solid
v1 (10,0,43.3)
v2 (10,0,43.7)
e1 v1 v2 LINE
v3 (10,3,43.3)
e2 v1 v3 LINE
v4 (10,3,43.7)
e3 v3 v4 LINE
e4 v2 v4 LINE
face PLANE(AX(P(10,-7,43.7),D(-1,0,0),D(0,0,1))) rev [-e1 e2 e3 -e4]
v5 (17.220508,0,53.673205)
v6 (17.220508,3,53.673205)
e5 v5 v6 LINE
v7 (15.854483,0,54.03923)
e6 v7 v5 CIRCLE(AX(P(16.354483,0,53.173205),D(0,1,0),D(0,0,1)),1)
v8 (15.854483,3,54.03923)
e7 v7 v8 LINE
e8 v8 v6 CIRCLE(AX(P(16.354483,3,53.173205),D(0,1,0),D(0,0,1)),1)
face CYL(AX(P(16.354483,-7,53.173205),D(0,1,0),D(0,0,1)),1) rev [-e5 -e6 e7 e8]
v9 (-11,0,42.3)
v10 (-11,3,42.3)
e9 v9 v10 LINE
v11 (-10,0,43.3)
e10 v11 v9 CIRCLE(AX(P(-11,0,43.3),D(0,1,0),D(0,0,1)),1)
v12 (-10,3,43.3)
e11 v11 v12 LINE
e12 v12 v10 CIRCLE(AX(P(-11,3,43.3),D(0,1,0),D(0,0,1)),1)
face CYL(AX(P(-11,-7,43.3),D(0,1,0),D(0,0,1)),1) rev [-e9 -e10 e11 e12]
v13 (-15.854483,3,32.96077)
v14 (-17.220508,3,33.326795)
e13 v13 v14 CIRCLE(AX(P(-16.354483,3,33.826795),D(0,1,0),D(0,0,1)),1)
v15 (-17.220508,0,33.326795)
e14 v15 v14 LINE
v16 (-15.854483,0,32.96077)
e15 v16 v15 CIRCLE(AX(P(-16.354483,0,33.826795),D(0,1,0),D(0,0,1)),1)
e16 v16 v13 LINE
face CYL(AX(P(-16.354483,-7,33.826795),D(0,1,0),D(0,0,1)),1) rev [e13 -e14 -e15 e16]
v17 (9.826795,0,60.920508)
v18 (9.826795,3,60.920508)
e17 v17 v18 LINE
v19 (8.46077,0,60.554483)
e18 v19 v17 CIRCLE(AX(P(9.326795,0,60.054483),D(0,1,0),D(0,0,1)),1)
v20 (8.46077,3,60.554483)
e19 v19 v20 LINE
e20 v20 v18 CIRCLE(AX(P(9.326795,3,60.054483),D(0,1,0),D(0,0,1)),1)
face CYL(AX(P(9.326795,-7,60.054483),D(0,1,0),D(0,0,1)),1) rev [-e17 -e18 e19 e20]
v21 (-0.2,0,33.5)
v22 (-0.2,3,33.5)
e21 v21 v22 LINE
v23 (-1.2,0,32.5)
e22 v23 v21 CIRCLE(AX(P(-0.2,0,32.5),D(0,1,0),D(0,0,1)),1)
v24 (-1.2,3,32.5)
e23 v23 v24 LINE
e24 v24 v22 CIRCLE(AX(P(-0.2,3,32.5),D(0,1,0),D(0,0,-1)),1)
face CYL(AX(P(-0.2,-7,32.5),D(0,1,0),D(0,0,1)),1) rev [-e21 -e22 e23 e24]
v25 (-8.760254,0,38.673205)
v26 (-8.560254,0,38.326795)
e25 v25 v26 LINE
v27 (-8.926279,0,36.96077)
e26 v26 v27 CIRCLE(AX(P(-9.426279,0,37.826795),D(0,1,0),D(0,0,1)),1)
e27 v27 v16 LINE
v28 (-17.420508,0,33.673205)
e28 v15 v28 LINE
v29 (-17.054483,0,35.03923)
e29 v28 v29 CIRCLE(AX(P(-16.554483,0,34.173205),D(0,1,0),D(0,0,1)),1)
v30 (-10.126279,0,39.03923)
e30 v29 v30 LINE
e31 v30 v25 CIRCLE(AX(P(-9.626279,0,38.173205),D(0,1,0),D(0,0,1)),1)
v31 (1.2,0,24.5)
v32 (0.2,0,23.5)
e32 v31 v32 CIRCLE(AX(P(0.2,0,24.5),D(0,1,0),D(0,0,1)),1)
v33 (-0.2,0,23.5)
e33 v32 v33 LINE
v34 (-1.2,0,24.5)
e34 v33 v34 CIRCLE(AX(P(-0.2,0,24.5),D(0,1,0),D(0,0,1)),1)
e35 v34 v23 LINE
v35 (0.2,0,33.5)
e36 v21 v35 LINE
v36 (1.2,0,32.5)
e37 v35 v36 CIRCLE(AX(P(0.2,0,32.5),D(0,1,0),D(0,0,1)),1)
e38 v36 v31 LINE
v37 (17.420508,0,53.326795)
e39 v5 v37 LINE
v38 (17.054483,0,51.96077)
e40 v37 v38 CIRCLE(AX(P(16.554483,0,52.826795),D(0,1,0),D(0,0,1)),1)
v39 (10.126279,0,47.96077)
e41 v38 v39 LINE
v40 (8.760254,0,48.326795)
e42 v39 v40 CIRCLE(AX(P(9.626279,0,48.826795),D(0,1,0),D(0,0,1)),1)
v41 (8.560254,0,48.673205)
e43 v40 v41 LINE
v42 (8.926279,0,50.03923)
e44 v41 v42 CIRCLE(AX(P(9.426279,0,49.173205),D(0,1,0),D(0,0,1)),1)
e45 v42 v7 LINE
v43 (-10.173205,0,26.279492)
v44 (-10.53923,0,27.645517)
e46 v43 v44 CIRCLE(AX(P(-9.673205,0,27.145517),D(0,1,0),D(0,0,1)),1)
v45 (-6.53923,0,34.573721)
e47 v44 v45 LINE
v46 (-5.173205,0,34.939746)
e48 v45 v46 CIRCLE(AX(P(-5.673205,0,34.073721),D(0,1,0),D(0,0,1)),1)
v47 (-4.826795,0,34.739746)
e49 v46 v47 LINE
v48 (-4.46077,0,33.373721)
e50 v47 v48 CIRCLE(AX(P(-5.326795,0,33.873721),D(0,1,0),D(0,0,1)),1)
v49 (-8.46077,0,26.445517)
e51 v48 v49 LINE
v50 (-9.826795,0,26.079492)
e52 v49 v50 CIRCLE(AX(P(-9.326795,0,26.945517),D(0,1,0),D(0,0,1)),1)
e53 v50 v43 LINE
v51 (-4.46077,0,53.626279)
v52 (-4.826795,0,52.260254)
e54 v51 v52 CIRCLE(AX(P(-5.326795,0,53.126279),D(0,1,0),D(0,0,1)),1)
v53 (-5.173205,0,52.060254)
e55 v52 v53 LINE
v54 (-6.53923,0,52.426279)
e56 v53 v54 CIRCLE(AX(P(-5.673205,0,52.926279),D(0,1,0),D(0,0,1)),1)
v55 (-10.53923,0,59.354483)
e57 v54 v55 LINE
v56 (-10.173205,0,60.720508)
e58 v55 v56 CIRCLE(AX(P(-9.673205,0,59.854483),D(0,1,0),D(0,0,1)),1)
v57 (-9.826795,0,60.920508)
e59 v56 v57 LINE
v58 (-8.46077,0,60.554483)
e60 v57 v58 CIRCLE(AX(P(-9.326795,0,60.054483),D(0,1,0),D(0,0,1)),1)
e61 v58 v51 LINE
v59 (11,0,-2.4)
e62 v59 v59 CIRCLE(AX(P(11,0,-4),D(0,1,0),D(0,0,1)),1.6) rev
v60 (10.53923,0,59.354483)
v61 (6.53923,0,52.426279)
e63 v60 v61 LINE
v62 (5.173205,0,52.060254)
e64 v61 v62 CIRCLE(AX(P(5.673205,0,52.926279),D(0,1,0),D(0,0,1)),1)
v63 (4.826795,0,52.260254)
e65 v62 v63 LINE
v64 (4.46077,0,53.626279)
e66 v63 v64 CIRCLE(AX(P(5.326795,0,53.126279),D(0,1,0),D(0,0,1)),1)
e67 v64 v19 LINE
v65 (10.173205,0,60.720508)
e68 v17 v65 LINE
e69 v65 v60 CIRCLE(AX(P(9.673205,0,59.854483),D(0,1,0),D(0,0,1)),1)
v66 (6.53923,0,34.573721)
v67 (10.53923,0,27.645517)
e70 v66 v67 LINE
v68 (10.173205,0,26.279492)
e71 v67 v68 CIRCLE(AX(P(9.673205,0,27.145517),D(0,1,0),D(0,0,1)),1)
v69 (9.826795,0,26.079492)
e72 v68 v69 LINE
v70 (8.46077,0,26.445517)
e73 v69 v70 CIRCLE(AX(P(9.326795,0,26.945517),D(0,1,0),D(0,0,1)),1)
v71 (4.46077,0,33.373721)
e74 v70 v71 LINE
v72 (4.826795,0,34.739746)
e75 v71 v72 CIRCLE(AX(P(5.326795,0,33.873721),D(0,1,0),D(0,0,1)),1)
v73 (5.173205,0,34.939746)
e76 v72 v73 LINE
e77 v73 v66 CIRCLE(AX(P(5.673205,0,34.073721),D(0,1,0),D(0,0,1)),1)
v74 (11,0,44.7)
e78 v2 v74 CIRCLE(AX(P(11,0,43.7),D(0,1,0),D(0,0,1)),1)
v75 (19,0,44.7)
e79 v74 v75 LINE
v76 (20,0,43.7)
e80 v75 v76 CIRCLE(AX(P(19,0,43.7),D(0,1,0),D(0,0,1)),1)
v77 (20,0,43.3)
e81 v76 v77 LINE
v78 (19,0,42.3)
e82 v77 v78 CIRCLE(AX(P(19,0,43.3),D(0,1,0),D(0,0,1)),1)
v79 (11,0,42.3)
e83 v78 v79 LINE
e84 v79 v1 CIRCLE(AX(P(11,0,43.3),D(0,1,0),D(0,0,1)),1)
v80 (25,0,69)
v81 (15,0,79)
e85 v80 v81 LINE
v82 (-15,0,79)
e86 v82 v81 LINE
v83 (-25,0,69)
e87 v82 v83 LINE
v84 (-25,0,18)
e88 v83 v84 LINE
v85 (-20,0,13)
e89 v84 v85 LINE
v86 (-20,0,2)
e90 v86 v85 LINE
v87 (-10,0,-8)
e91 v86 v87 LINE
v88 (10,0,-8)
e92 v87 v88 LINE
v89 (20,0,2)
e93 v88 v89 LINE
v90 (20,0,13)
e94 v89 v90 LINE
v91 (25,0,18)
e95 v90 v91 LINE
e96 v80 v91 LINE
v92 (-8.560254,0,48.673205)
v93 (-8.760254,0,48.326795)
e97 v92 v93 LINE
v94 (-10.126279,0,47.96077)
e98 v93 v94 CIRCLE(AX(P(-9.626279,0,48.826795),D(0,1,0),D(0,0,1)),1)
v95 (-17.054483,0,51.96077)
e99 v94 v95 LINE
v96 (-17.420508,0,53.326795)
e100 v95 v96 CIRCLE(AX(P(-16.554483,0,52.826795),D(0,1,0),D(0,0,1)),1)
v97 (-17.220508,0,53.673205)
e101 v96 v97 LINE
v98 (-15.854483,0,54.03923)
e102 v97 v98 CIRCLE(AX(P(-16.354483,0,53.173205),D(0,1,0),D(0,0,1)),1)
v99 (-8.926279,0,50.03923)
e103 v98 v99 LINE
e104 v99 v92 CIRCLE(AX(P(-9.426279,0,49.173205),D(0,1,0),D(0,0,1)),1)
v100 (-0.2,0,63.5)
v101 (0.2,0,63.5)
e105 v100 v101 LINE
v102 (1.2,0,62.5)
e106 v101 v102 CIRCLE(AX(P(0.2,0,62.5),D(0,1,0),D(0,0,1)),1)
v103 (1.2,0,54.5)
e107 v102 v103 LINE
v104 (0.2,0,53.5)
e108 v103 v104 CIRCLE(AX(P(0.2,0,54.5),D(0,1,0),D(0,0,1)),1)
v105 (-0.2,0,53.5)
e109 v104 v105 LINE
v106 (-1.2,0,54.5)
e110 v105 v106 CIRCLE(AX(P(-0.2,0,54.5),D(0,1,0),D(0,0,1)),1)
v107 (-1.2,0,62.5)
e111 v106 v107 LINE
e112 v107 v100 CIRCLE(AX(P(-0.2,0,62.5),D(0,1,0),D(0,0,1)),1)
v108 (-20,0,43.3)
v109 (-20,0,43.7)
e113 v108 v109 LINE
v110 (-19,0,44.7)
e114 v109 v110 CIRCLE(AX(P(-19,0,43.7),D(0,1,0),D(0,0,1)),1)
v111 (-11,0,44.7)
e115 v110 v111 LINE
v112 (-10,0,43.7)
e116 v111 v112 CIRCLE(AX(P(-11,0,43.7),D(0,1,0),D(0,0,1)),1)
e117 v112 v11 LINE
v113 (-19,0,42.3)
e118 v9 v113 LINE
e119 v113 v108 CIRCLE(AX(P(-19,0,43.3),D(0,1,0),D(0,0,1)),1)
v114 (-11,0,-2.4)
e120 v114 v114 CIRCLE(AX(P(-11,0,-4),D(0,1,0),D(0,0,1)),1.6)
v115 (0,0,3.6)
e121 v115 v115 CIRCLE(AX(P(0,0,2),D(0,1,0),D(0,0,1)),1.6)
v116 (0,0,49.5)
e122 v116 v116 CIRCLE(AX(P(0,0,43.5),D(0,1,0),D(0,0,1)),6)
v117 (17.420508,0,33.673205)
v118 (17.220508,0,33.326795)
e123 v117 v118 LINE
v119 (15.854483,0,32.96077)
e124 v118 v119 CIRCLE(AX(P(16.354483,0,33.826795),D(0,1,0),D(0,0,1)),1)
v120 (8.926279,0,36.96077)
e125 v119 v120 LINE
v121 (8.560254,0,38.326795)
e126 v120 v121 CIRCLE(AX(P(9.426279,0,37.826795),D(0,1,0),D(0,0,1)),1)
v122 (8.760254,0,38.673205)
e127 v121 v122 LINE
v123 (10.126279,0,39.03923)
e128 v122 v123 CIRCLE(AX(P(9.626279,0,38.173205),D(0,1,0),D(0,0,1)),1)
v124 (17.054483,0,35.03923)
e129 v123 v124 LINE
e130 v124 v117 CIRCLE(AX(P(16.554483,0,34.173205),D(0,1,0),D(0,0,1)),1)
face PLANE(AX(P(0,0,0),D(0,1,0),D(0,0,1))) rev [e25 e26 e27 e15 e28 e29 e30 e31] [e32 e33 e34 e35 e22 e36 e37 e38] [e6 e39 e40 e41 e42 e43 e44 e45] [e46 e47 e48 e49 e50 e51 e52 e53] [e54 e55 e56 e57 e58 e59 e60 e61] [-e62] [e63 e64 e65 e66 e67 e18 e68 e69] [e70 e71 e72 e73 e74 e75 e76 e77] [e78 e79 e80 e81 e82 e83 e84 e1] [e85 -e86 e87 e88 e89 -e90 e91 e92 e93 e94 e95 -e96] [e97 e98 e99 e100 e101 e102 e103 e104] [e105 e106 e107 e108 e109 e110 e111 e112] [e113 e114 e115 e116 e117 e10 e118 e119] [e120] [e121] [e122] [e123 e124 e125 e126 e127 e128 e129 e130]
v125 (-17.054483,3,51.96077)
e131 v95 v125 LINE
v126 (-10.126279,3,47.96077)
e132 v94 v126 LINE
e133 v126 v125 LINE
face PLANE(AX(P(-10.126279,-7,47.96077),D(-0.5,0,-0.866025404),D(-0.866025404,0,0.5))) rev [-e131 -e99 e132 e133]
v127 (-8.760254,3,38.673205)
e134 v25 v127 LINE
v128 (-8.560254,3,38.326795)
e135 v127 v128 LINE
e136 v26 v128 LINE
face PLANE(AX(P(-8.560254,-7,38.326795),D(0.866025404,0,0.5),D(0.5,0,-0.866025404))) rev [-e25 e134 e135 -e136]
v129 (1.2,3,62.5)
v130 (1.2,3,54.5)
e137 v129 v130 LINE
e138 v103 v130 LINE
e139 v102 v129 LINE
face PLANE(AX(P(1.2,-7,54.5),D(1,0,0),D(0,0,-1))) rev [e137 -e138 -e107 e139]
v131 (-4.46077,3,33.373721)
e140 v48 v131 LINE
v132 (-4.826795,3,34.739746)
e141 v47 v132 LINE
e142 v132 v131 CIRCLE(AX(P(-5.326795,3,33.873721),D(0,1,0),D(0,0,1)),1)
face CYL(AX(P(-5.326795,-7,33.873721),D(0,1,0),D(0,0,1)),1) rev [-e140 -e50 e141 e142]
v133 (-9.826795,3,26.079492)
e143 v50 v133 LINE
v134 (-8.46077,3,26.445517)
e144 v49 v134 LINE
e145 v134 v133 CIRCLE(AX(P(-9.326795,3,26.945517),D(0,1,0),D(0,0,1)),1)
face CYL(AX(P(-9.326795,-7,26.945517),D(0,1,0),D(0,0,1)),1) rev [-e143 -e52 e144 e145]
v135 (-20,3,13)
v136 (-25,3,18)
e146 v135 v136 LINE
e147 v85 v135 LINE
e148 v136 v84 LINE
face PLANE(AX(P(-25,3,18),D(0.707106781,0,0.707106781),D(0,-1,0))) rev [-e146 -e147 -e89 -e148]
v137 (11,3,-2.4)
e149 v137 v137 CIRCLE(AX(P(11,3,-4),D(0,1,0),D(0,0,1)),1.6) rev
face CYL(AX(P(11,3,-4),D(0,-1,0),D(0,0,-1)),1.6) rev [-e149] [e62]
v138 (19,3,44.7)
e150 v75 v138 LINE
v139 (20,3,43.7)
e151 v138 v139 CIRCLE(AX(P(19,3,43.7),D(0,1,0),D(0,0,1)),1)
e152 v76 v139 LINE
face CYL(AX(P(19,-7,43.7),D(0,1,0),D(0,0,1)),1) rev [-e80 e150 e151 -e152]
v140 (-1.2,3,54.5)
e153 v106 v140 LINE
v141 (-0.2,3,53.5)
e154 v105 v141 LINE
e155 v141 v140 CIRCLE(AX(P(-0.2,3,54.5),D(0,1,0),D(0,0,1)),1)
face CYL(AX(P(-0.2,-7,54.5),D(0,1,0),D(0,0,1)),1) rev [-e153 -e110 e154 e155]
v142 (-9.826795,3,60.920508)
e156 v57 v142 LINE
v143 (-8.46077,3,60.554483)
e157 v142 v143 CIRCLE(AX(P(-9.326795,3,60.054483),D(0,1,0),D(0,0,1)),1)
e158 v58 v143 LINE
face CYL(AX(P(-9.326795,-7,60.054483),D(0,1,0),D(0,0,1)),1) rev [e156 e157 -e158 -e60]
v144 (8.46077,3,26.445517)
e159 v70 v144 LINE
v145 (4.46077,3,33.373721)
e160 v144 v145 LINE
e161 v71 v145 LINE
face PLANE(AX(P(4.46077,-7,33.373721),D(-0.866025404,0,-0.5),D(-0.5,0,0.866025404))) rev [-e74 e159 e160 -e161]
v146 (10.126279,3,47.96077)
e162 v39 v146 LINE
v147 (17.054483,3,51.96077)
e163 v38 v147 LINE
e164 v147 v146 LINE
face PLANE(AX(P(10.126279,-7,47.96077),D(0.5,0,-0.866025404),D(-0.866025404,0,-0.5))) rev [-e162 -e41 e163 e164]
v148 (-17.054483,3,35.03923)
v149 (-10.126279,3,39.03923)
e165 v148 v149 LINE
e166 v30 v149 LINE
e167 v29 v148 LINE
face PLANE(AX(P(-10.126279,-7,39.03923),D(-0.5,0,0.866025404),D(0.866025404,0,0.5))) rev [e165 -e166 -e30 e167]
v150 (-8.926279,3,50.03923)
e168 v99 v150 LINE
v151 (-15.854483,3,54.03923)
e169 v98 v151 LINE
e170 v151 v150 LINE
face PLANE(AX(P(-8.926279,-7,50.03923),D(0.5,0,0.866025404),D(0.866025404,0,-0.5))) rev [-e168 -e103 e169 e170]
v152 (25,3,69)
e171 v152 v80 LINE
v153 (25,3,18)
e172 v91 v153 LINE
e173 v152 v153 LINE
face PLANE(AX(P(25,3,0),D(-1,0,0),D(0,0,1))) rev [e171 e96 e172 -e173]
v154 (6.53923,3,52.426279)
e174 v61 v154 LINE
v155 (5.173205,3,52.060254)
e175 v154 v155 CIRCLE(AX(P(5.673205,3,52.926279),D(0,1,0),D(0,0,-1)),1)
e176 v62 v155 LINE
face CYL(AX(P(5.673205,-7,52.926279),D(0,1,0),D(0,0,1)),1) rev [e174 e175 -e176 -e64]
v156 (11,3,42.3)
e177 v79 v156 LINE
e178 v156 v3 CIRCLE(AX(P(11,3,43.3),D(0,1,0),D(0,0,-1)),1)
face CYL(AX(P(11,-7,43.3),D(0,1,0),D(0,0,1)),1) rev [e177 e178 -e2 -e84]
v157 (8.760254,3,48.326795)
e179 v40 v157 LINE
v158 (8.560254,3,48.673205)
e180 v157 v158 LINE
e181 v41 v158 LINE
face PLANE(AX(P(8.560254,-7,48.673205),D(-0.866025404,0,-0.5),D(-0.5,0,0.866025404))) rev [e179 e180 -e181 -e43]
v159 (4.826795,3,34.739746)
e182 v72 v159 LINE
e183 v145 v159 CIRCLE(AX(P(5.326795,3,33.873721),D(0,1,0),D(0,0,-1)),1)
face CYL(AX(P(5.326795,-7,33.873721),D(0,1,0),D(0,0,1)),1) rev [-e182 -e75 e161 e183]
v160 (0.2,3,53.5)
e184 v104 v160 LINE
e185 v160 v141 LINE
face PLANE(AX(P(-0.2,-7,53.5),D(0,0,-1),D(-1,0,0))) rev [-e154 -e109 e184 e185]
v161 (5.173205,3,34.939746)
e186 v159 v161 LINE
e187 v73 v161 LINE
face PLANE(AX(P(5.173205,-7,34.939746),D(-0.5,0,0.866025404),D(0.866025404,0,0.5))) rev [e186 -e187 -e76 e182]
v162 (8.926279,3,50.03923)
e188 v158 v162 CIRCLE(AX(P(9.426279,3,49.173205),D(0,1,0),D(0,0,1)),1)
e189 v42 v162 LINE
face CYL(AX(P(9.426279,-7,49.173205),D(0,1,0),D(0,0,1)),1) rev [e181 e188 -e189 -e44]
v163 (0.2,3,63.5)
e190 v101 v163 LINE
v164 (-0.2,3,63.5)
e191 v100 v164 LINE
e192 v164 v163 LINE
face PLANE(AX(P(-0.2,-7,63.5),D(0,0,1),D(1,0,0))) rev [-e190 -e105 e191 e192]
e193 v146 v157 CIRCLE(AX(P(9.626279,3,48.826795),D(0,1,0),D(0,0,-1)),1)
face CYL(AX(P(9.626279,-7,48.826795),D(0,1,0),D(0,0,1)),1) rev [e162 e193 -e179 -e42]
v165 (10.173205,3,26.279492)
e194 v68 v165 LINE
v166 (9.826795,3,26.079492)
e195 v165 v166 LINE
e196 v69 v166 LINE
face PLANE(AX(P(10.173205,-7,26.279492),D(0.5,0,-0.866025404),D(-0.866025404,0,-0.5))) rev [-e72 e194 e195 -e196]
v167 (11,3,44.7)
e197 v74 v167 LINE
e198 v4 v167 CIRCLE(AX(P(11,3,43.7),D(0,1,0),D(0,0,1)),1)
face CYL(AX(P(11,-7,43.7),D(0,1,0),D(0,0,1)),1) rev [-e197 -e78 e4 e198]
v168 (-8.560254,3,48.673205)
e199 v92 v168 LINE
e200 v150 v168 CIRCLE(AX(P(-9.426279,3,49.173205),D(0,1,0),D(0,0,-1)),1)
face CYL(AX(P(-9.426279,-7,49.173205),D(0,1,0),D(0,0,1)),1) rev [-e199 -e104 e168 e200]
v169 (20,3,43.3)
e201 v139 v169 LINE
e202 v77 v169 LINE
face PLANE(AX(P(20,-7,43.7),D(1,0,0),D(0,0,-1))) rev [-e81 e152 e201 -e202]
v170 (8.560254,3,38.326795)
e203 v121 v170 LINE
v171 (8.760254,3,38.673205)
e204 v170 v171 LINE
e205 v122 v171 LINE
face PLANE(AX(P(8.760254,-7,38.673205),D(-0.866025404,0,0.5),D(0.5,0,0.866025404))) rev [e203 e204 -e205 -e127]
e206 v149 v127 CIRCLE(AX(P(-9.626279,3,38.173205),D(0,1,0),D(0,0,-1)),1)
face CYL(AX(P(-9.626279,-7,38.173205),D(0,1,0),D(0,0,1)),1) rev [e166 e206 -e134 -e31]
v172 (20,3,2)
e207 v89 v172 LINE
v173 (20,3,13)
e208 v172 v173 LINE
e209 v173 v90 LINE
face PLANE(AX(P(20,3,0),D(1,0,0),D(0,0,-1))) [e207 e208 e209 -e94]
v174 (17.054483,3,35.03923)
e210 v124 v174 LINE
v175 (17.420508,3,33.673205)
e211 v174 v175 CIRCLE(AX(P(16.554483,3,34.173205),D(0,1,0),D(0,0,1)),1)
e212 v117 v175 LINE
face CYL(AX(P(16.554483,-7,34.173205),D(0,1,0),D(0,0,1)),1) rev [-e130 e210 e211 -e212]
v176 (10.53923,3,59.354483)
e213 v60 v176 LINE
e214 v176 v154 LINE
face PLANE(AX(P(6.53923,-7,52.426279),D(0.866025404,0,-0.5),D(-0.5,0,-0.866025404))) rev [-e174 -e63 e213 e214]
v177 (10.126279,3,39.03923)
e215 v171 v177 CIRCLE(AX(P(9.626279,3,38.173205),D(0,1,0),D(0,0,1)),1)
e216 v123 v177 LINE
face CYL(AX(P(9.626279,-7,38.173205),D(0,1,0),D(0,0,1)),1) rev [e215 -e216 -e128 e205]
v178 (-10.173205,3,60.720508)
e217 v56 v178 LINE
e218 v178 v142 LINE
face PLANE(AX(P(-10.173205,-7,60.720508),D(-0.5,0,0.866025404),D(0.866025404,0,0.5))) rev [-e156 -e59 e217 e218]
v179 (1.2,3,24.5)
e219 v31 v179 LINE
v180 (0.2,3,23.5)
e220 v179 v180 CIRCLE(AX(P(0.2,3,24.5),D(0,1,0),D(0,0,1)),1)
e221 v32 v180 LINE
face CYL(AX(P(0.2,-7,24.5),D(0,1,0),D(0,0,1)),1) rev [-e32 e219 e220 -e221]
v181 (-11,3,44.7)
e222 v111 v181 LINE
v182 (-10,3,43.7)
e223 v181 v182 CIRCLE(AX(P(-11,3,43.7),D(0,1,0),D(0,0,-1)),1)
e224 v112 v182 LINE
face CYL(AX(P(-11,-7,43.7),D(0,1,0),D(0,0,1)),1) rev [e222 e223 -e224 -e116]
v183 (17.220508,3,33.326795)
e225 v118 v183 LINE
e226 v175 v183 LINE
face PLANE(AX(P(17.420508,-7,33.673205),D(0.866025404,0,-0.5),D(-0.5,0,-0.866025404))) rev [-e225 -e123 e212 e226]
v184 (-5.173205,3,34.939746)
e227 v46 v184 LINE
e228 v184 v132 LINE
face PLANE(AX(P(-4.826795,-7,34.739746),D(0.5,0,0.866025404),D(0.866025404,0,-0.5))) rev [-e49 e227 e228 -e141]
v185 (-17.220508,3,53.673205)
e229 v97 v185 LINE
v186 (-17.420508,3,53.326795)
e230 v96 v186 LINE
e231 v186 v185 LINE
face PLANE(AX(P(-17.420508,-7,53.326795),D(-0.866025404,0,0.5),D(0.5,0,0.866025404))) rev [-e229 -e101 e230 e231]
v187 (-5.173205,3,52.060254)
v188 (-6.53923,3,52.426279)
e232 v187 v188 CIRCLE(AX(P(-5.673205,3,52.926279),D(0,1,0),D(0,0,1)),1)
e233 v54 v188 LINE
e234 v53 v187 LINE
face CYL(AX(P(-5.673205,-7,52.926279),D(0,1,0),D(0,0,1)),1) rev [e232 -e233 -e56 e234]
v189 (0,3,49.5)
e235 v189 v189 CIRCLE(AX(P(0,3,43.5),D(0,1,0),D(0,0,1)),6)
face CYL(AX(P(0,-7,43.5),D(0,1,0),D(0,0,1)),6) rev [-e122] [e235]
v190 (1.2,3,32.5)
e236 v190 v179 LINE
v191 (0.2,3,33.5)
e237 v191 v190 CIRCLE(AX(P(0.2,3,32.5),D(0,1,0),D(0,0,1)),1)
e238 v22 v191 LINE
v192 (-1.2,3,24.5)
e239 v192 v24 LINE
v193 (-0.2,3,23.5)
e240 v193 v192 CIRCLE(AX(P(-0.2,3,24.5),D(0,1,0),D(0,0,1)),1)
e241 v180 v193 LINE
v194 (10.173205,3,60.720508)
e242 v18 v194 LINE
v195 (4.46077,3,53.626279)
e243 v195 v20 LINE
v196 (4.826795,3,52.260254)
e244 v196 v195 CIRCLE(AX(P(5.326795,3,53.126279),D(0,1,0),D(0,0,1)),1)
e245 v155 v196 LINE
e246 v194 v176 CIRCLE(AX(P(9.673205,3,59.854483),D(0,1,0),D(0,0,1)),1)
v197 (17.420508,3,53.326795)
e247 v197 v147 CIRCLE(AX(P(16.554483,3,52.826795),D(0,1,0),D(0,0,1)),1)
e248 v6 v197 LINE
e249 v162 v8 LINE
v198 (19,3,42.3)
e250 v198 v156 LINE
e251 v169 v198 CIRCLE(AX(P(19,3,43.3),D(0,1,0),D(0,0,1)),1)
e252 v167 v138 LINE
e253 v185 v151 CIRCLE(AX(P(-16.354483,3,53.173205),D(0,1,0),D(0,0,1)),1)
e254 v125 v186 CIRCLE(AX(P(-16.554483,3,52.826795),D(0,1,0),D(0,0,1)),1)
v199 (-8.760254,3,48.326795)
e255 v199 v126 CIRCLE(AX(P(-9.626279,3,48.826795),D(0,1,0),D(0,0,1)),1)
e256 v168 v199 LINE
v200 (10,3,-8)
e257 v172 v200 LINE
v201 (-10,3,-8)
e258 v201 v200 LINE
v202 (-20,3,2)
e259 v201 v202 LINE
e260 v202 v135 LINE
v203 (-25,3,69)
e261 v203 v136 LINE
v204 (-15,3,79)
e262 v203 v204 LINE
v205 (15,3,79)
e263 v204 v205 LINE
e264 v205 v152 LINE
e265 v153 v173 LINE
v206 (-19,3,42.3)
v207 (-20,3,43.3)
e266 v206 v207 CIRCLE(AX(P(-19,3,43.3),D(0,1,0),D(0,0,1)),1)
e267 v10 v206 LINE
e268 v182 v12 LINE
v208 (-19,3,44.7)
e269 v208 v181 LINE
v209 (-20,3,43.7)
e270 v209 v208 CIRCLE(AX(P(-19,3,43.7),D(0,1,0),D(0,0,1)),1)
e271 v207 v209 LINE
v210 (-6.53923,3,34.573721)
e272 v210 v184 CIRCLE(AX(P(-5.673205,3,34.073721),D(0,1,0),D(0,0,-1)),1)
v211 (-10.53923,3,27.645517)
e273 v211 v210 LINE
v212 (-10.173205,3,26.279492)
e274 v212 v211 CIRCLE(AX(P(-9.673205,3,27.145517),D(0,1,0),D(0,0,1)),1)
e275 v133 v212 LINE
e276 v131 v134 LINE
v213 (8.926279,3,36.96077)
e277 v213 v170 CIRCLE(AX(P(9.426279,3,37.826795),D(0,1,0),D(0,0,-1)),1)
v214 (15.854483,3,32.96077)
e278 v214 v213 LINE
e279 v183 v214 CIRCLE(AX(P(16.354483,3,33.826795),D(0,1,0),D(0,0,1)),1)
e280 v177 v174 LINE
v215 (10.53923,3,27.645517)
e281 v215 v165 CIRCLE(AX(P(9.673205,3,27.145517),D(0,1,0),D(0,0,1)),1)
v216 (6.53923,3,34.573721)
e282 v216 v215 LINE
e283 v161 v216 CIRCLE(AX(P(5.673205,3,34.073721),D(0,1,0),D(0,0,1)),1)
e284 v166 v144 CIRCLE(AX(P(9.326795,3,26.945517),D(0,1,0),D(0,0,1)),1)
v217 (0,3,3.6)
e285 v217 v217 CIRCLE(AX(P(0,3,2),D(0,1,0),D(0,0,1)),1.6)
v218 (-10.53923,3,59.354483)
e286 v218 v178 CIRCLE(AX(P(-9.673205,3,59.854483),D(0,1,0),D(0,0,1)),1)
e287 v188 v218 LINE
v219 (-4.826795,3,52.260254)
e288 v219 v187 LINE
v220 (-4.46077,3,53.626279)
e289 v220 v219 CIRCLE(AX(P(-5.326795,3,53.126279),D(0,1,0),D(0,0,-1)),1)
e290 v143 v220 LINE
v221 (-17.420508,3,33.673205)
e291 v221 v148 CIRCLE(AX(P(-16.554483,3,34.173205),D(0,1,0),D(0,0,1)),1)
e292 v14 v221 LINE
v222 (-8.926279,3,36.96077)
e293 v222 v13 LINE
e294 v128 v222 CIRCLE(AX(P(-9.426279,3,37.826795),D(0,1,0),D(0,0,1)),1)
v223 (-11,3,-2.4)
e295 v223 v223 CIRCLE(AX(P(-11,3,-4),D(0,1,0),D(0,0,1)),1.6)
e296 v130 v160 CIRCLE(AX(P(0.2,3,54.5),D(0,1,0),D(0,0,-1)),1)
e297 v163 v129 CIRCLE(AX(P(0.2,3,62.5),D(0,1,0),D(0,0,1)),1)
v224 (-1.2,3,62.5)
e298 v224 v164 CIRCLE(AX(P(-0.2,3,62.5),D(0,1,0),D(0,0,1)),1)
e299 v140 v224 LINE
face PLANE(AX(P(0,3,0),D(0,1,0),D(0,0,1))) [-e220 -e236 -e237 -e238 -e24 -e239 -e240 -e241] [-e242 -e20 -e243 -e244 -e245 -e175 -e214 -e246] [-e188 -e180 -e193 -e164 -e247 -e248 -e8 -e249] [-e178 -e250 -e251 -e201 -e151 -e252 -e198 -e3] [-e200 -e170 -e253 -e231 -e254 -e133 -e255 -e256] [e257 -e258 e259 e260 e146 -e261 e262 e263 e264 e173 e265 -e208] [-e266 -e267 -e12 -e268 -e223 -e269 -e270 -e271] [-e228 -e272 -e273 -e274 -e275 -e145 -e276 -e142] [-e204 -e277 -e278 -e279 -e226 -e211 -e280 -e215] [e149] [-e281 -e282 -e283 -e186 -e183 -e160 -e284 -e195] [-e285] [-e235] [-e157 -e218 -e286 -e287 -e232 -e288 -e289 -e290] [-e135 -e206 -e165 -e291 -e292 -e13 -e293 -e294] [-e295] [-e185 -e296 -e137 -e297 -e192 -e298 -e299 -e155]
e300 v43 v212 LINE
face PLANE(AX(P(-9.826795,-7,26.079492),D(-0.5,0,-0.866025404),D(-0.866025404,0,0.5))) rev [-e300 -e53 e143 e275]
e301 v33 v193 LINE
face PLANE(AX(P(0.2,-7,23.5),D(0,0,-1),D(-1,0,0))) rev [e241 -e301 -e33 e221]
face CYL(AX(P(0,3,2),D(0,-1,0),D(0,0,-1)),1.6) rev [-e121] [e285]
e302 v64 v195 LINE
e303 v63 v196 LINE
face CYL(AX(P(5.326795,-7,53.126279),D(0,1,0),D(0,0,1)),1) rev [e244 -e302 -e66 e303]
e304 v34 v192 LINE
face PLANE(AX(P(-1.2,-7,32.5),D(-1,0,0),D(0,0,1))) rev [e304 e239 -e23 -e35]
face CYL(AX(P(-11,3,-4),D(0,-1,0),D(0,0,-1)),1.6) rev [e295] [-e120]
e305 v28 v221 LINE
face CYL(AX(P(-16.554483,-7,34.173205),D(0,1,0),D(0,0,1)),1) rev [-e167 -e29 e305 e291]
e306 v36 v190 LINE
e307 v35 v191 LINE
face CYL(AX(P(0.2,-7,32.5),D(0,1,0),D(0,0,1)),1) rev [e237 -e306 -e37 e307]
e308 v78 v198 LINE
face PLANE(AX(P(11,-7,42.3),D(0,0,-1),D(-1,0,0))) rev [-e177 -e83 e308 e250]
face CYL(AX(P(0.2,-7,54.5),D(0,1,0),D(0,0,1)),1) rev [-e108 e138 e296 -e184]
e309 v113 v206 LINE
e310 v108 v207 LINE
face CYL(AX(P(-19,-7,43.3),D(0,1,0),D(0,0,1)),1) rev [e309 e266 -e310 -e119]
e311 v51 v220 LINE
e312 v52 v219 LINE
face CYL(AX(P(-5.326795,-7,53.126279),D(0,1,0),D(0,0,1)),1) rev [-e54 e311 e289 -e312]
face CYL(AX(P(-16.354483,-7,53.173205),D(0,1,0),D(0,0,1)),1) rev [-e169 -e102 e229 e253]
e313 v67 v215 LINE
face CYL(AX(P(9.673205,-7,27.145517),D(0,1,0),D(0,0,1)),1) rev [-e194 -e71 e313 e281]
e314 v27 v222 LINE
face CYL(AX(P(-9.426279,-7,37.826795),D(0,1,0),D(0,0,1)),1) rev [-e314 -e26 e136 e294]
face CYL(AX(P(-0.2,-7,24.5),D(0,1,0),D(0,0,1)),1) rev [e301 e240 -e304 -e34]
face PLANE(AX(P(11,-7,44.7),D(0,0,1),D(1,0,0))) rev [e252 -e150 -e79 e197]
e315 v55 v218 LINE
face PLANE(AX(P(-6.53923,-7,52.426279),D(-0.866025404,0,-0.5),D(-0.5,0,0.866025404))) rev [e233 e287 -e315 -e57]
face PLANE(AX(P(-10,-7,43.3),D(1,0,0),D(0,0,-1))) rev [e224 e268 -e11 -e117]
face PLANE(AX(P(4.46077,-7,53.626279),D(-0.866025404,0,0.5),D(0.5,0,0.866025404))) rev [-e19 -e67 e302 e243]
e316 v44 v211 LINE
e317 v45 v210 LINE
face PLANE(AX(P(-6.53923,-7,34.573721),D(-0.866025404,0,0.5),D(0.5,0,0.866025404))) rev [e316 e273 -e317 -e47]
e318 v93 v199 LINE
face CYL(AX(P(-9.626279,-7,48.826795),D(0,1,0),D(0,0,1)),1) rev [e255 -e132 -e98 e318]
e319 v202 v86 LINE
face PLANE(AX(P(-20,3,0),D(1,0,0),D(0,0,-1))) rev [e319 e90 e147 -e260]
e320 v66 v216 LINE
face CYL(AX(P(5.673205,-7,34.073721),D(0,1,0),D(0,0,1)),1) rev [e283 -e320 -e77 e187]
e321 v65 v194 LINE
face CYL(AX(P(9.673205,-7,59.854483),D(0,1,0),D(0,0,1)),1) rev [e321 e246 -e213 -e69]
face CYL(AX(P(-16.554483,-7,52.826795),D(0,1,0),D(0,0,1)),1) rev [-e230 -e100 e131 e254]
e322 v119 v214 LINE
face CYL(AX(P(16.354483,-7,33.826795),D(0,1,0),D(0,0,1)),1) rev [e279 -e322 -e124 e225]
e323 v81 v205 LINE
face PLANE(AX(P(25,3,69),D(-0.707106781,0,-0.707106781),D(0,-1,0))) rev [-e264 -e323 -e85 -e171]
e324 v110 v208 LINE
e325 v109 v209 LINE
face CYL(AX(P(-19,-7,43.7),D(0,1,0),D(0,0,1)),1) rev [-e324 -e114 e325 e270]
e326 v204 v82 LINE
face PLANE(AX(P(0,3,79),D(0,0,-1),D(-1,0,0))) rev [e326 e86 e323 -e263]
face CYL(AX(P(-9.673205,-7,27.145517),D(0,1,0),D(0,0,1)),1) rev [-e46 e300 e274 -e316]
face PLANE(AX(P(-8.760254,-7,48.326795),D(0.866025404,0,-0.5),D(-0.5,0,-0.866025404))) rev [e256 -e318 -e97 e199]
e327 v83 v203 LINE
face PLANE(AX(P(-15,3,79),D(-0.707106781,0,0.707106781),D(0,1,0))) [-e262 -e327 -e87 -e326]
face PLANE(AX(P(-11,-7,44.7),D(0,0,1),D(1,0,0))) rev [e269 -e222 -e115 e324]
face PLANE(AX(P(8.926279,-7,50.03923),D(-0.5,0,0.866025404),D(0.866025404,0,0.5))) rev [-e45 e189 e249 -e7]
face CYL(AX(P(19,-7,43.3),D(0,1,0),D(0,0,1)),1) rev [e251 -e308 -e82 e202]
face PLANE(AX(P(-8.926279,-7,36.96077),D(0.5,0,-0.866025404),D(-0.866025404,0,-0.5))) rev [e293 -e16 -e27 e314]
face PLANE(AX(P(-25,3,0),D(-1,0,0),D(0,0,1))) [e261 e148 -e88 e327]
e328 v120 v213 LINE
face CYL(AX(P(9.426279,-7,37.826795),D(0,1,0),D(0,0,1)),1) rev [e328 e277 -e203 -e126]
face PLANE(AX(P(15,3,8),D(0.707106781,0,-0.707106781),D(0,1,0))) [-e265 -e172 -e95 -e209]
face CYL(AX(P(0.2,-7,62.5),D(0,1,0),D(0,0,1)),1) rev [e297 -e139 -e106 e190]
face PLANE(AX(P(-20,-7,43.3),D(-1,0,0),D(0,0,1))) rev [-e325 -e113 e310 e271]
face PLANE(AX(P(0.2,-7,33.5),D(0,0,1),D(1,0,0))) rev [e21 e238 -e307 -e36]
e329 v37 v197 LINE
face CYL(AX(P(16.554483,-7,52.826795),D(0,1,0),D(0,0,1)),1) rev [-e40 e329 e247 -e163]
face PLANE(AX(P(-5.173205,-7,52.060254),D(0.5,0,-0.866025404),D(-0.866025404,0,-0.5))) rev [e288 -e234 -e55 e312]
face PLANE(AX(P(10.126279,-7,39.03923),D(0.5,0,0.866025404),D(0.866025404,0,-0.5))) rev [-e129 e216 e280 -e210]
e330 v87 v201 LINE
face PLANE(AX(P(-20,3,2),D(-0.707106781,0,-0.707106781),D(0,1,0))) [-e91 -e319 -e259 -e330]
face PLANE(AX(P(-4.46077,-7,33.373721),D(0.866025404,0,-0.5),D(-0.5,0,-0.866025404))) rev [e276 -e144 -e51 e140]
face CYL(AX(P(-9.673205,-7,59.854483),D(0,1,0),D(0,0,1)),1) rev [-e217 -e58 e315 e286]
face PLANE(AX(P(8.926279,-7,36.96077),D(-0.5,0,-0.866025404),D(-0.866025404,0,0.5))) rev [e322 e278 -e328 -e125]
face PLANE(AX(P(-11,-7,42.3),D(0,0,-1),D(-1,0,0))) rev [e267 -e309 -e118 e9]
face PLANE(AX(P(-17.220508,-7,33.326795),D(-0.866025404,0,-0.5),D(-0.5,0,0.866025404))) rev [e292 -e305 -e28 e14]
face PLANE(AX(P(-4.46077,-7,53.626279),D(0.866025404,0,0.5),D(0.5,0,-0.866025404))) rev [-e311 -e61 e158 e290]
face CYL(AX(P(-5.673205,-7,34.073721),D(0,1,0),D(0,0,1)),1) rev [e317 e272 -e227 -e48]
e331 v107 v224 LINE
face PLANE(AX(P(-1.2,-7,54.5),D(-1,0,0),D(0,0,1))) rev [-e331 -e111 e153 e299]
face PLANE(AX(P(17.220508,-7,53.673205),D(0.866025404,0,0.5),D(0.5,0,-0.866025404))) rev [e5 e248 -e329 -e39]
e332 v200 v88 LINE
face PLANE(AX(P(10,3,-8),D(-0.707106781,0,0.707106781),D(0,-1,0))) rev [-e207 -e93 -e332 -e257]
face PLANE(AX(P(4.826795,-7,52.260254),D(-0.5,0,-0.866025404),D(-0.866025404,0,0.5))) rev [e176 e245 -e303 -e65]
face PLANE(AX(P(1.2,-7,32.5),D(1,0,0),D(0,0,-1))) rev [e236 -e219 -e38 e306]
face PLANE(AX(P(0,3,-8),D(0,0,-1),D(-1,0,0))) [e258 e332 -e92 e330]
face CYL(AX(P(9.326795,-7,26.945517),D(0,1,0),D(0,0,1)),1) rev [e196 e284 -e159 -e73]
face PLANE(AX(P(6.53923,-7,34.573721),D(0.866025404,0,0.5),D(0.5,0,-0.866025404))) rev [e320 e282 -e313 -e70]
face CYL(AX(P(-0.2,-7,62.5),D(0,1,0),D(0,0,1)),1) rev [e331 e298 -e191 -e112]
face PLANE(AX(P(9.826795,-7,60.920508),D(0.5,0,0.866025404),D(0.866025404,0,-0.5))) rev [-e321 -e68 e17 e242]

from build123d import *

# Parameters (mm, degrees)
SKETCH_1_W          = 40
SKETCH_1_H          = 16
SKETCH_1_R          = 1.6
EXTRUDE_1_DEPTH     = 3
CHAMFER_1_SIZE      = 10
SKETCH_3_R          = 6
CUT_EXTRUDE_1_DEPTH = 10


with BuildPart() as part:
    # 草图1 → 凸台-拉伸1 (new body)
    # profile 1 of 2: a face of its own
    with BuildSketch(Plane(origin=(0, 0, 0), x_dir=(1, 0, 0), z_dir=(0, 1, 0))):
        Polygon((20, -8), (-20, -8), (-25, -8), (-25, -79), (25, -79), (25, -8), align=None)
    # profile 2 of 2: a face of its own
    with BuildSketch(Plane(origin=(0, 0, 0), x_dir=(1, 0, 0), z_dir=(0, 1, 0))):
        Rectangle(SKETCH_1_W, SKETCH_1_H)
        with Locations(Location((-11, 4, 0), (0, 0, 270))):
            Circle(SKETCH_1_R, mode=Mode.SUBTRACT)
        with Locations(Location((0, -2, 0), (0, 0, 270))):
            Circle(SKETCH_1_R, mode=Mode.SUBTRACT)
        with Locations(Location((11, 4, 0), (0, 0, 270))):
            Circle(SKETCH_1_R, mode=Mode.SUBTRACT)
    extrude(amount=EXTRUDE_1_DEPTH)

    # 倒角1
    # the kernel refuses this chamfer: 10 mm, written as the material it takes off along each edge
    with BuildSketch(Plane(origin=(-25, -25.71682988, 79), x_dir=(-0.027495876610586317, 0, -0.9996219169112968), z_dir=(0, 1, 0)), Plane(origin=(-20, -25.71682988, -8), x_dir=(0.9996219169112968, 0, -0.027495876610586317), z_dir=(0, 1, 0)), Plane(origin=(20, -25.71682988, -8), x_dir=(0.027495876610586317, 0, 0.9996219169112968), z_dir=(0, 1, 0))) as chamfer_1_piece_1:
        Polygon((CHAMFER_1_SIZE * 0.999621916911, -CHAMFER_1_SIZE * 0.0274958766106), (-CHAMFER_1_SIZE * 0.0274958766106, -CHAMFER_1_SIZE * 0.999621916911), (0, 0), align=None)
    extrude(amount=54.433659759, mode=Mode.SUBTRACT)
    with BuildSketch(Plane(origin=(-25, -25.71682988, 8), x_dir=(-0.027495876610586313, 0, 0.9996219169112968), z_dir=(0, 1, 0))) as chamfer_1_piece_2_section:
        Polygon((CHAMFER_1_SIZE * 0.999621916911, CHAMFER_1_SIZE * 0.0274958766106), (-CHAMFER_1_SIZE * 0.0274958766106, CHAMFER_1_SIZE * 0.999621916911), (0, 0), align=None)
    chamfer_1_piece_2 = extrude(amount=54.433659759, mode=Mode.PRIVATE)
    chamfer_1_piece_2 = split(chamfer_1_piece_2, bisect_by=Plane(origin=(-20, 1.5, 11.934010841), z_dir=(-1, 0, 0)), keep=Keep.TOP, mode=Mode.PRIVATE)
    add(chamfer_1_piece_2, mode=Mode.SUBTRACT)
    with BuildSketch(Plane(origin=(25, -25.71682988, 8), x_dir=(-0.9996219169112968, 0, -0.027495876610586403), z_dir=(0, 1, 0))) as chamfer_1_piece_3_section:
        Polygon((CHAMFER_1_SIZE * 0.999621916911, CHAMFER_1_SIZE * 0.0274958766106), (-CHAMFER_1_SIZE * 0.0274958766106, CHAMFER_1_SIZE * 0.999621916911), (0, 0), align=None)
    chamfer_1_piece_3 = extrude(amount=54.433659759, mode=Mode.PRIVATE)
    chamfer_1_piece_3 = split(chamfer_1_piece_3, bisect_by=Plane(origin=(20, 1.5, 11.934010841), z_dir=(1, 0, 0)), keep=Keep.TOP, mode=Mode.PRIVATE)
    add(chamfer_1_piece_3, mode=Mode.SUBTRACT)
    with BuildSketch(Plane(origin=(25, -25.71682988, 79), x_dir=(0.027495876610586317, 0, -0.9996219169112968), z_dir=(0, 1, 0))) as chamfer_1_piece_4:
        Polygon((CHAMFER_1_SIZE * 0.999621916911, CHAMFER_1_SIZE * 0.0274958766106), (-CHAMFER_1_SIZE * 0.0274958766106, CHAMFER_1_SIZE * 0.999621916911), (0, 0), align=None)
    extrude(amount=54.433659759, mode=Mode.SUBTRACT)

    # 草图3 → 切除-拉伸1 (cut)
    with BuildSketch(Plane(origin=(0, 3, 0), x_dir=(1, 0, 0), z_dir=(0, 1, 0))):
        with Locations(Location((0, -43.5, 0), (0, 0, 270))):
            Circle(SKETCH_3_R)
        with BuildLine():
            Line((-6.539230485, -52.426279442), (-10.539230485, -59.354482672))
            ThreePointArc((-10.539230485, -59.354482672), (-10.639130907, -60.113301717), (-10.173205081, -60.720508076))
            Line((-10.173205081, -60.720508076), (-9.826794919, -60.920508076))
            ThreePointArc((-9.826794919, -60.920508076), (-9.067975874, -61.020408498), (-8.460769515, -60.554482672))
            Line((-8.460769515, -60.554482672), (-4.460769515, -53.626279442))
            ThreePointArc((-4.460769515, -53.626279442), (-4.360869093, -52.867460397), (-4.826794919, -52.260254038))
            Line((-4.826794919, -52.260254038), (-5.173205081, -52.060254038))
            ThreePointArc((-5.173205081, -52.060254038), (-5.932024126, -51.960353615), (-6.539230485, -52.426279442))
        make_face()
        with BuildLine():
            Line((-0.2, -53.5), (0.2, -53.5))
            ThreePointArc((0.2, -53.5), (0.907106781, -53.792893219), (1.2, -54.5))
            Line((1.2, -54.5), (1.2, -62.5))
            ThreePointArc((1.2, -62.5), (0.907106781, -63.207106781), (0.2, -63.5))
            Line((0.2, -63.5), (-0.2, -63.5))
            ThreePointArc((-0.2, -63.5), (-0.907106781, -63.207106781), (-1.2, -62.5))
            Line((-1.2, -62.5), (-1.2, -54.5))
            ThreePointArc((-1.2, -54.5), (-0.907106781, -53.792893219), (-0.2, -53.5))
        make_face()
        with BuildLine():
            Line((-10.126279442, -47.960769515), (-17.054482672, -51.960769515))
            ThreePointArc((-17.054482672, -51.960769515), (-17.520408498, -52.567975874), (-17.420508076, -53.326794919))
            Line((-17.420508076, -53.326794919), (-17.220508076, -53.673205081))
            ThreePointArc((-17.220508076, -53.673205081), (-16.613301717, -54.139130907), (-15.854482672, -54.039230485))
            Line((-15.854482672, -54.039230485), (-8.926279442, -50.039230485))
            ThreePointArc((-8.926279442, -50.039230485), (-8.460353615, -49.432024126), (-8.560254038, -48.673205081))
            Line((-8.560254038, -48.673205081), (-8.760254038, -48.326794919))
            ThreePointArc((-8.760254038, -48.326794919), (-9.367460397, -47.860869093), (-10.126279442, -47.960769515))
        make_face()
        with BuildLine():
            Line((-11, -42.3), (-19, -42.3))
            ThreePointArc((-19, -42.3), (-19.707106781, -42.592893219), (-20, -43.3))
            Line((-20, -43.3), (-20, -43.7))
            ThreePointArc((-20, -43.7), (-19.707106781, -44.407106781), (-19, -44.7))
            Line((-19, -44.7), (-11, -44.7))
            ThreePointArc((-11, -44.7), (-10.292893219, -44.407106781), (-10, -43.7))
            Line((-10, -43.7), (-10, -43.3))
            ThreePointArc((-10, -43.3), (-10.292893219, -42.592893219), (-11, -42.3))
        make_face()
        with BuildLine():
            Line((-8.926279442, -36.960769515), (-15.854482672, -32.960769515))
            ThreePointArc((-15.854482672, -32.960769515), (-16.613301717, -32.860869093), (-17.220508076, -33.326794919))
            Line((-17.220508076, -33.326794919), (-17.420508076, -33.673205081))
            ThreePointArc((-17.420508076, -33.673205081), (-17.520408498, -34.432024126), (-17.054482672, -35.039230485))
            Line((-17.054482672, -35.039230485), (-10.126279442, -39.039230485))
            ThreePointArc((-10.126279442, -39.039230485), (-9.367460397, -39.139130907), (-8.760254038, -38.673205081))
            Line((-8.760254038, -38.673205081), (-8.560254038, -38.326794919))
            ThreePointArc((-8.560254038, -38.326794919), (-8.460353615, -37.567975874), (-8.926279442, -36.960769515))
        make_face()
        with BuildLine():
            Line((-4.460769515, -33.373720558), (-8.460769515, -26.445517328))
            ThreePointArc((-8.460769515, -26.445517328), (-9.067975874, -25.979591502), (-9.826794919, -26.079491924))
            Line((-9.826794919, -26.079491924), (-10.173205081, -26.279491924))
            ThreePointArc((-10.173205081, -26.279491924), (-10.639130907, -26.886698283), (-10.539230485, -27.645517328))
            Line((-10.539230485, -27.645517328), (-6.539230485, -34.573720558))
            ThreePointArc((-6.539230485, -34.573720558), (-5.932024126, -35.039646385), (-5.173205081, -34.939745962))
            Line((-5.173205081, -34.939745962), (-4.826794919, -34.739745962))
            ThreePointArc((-4.826794919, -34.739745962), (-4.360869093, -34.132539603), (-4.460769515, -33.373720558))
        make_face()
        with BuildLine():
            Line((1.2, -32.5), (1.2, -24.5))
            ThreePointArc((1.2, -24.5), (0.907106781, -23.792893219), (0.2, -23.5))
            Line((0.2, -23.5), (-0.2, -23.5))
            ThreePointArc((-0.2, -23.5), (-0.907106781, -23.792893219), (-1.2, -24.5))
            Line((-1.2, -24.5), (-1.2, -32.5))
            ThreePointArc((-1.2, -32.5), (-0.907106781, -33.207106781), (-0.2, -33.5))
            Line((-0.2, -33.5), (0.2, -33.5))
            ThreePointArc((0.2, -33.5), (0.907106781, -33.207106781), (1.2, -32.5))
        make_face()
        with BuildLine():
            Line((6.539230485, -34.573720558), (10.539230485, -27.645517328))
            ThreePointArc((10.539230485, -27.645517328), (10.639130907, -26.886698283), (10.173205081, -26.279491924))
            Line((10.173205081, -26.279491924), (9.826794919, -26.079491924))
            ThreePointArc((9.826794919, -26.079491924), (9.067975874, -25.979591502), (8.460769515, -26.445517328))
            Line((8.460769515, -26.445517328), (4.460769515, -33.373720558))
            ThreePointArc((4.460769515, -33.373720558), (4.360869093, -34.132539603), (4.826794919, -34.739745962))
            Line((4.826794919, -34.739745962), (5.173205081, -34.939745962))
            ThreePointArc((5.173205081, -34.939745962), (5.932024126, -35.039646385), (6.539230485, -34.573720558))
        make_face()
        with BuildLine():
            Line((10.126279442, -39.039230485), (17.054482672, -35.039230485))
            ThreePointArc((17.054482672, -35.039230485), (17.520408498, -34.432024126), (17.420508076, -33.673205081))
            Line((17.420508076, -33.673205081), (17.220508076, -33.326794919))
            ThreePointArc((17.220508076, -33.326794919), (16.613301717, -32.860869093), (15.854482672, -32.960769515))
            Line((15.854482672, -32.960769515), (8.926279442, -36.960769515))
            ThreePointArc((8.926279442, -36.960769515), (8.460353615, -37.567975874), (8.560254038, -38.326794919))
            Line((8.560254038, -38.326794919), (8.760254038, -38.673205081))
            ThreePointArc((8.760254038, -38.673205081), (9.367460397, -39.139130907), (10.126279442, -39.039230485))
        make_face()
        with BuildLine():
            Line((11, -44.7), (19, -44.7))
            ThreePointArc((19, -44.7), (19.707106781, -44.407106781), (20, -43.7))
            Line((20, -43.7), (20, -43.3))
            ThreePointArc((20, -43.3), (19.707106781, -42.592893219), (19, -42.3))
            Line((19, -42.3), (11, -42.3))
            ThreePointArc((11, -42.3), (10.292893219, -42.592893219), (10, -43.3))
            Line((10, -43.3), (10, -43.7))
            ThreePointArc((10, -43.7), (10.292893219, -44.407106781), (11, -44.7))
        make_face()
        with BuildLine():
            Line((8.926279442, -50.039230485), (15.854482672, -54.039230485))
            ThreePointArc((15.854482672, -54.039230485), (16.613301717, -54.139130907), (17.220508076, -53.673205081))
            Line((17.220508076, -53.673205081), (17.420508076, -53.326794919))
            ThreePointArc((17.420508076, -53.326794919), (17.520408498, -52.567975874), (17.054482672, -51.960769515))
            Line((17.054482672, -51.960769515), (10.126279442, -47.960769515))
            ThreePointArc((10.126279442, -47.960769515), (9.367460397, -47.860869093), (8.760254038, -48.326794919))
            Line((8.760254038, -48.326794919), (8.560254038, -48.673205081))
            ThreePointArc((8.560254038, -48.673205081), (8.460353615, -49.432024126), (8.926279442, -50.039230485))
        make_face()
        with BuildLine():
            Line((4.460769515, -53.626279442), (8.460769515, -60.554482672))
            ThreePointArc((8.460769515, -60.554482672), (9.067975874, -61.020408498), (9.826794919, -60.920508076))
            Line((9.826794919, -60.920508076), (10.173205081, -60.720508076))
            ThreePointArc((10.173205081, -60.720508076), (10.639130907, -60.113301717), (10.539230485, -59.354482672))
            Line((10.539230485, -59.354482672), (6.539230485, -52.426279442))
            ThreePointArc((6.539230485, -52.426279442), (5.932024126, -51.960353615), (5.173205081, -52.060254038))
            Line((5.173205081, -52.060254038), (4.826794919, -52.260254038))
            ThreePointArc((4.826794919, -52.260254038), (4.360869093, -52.867460397), (4.460769515, -53.626279442))
        make_face()
    extrude(amount=-CUT_EXTRUDE_1_DEPTH, mode=Mode.SUBTRACT)


solid = part.part
